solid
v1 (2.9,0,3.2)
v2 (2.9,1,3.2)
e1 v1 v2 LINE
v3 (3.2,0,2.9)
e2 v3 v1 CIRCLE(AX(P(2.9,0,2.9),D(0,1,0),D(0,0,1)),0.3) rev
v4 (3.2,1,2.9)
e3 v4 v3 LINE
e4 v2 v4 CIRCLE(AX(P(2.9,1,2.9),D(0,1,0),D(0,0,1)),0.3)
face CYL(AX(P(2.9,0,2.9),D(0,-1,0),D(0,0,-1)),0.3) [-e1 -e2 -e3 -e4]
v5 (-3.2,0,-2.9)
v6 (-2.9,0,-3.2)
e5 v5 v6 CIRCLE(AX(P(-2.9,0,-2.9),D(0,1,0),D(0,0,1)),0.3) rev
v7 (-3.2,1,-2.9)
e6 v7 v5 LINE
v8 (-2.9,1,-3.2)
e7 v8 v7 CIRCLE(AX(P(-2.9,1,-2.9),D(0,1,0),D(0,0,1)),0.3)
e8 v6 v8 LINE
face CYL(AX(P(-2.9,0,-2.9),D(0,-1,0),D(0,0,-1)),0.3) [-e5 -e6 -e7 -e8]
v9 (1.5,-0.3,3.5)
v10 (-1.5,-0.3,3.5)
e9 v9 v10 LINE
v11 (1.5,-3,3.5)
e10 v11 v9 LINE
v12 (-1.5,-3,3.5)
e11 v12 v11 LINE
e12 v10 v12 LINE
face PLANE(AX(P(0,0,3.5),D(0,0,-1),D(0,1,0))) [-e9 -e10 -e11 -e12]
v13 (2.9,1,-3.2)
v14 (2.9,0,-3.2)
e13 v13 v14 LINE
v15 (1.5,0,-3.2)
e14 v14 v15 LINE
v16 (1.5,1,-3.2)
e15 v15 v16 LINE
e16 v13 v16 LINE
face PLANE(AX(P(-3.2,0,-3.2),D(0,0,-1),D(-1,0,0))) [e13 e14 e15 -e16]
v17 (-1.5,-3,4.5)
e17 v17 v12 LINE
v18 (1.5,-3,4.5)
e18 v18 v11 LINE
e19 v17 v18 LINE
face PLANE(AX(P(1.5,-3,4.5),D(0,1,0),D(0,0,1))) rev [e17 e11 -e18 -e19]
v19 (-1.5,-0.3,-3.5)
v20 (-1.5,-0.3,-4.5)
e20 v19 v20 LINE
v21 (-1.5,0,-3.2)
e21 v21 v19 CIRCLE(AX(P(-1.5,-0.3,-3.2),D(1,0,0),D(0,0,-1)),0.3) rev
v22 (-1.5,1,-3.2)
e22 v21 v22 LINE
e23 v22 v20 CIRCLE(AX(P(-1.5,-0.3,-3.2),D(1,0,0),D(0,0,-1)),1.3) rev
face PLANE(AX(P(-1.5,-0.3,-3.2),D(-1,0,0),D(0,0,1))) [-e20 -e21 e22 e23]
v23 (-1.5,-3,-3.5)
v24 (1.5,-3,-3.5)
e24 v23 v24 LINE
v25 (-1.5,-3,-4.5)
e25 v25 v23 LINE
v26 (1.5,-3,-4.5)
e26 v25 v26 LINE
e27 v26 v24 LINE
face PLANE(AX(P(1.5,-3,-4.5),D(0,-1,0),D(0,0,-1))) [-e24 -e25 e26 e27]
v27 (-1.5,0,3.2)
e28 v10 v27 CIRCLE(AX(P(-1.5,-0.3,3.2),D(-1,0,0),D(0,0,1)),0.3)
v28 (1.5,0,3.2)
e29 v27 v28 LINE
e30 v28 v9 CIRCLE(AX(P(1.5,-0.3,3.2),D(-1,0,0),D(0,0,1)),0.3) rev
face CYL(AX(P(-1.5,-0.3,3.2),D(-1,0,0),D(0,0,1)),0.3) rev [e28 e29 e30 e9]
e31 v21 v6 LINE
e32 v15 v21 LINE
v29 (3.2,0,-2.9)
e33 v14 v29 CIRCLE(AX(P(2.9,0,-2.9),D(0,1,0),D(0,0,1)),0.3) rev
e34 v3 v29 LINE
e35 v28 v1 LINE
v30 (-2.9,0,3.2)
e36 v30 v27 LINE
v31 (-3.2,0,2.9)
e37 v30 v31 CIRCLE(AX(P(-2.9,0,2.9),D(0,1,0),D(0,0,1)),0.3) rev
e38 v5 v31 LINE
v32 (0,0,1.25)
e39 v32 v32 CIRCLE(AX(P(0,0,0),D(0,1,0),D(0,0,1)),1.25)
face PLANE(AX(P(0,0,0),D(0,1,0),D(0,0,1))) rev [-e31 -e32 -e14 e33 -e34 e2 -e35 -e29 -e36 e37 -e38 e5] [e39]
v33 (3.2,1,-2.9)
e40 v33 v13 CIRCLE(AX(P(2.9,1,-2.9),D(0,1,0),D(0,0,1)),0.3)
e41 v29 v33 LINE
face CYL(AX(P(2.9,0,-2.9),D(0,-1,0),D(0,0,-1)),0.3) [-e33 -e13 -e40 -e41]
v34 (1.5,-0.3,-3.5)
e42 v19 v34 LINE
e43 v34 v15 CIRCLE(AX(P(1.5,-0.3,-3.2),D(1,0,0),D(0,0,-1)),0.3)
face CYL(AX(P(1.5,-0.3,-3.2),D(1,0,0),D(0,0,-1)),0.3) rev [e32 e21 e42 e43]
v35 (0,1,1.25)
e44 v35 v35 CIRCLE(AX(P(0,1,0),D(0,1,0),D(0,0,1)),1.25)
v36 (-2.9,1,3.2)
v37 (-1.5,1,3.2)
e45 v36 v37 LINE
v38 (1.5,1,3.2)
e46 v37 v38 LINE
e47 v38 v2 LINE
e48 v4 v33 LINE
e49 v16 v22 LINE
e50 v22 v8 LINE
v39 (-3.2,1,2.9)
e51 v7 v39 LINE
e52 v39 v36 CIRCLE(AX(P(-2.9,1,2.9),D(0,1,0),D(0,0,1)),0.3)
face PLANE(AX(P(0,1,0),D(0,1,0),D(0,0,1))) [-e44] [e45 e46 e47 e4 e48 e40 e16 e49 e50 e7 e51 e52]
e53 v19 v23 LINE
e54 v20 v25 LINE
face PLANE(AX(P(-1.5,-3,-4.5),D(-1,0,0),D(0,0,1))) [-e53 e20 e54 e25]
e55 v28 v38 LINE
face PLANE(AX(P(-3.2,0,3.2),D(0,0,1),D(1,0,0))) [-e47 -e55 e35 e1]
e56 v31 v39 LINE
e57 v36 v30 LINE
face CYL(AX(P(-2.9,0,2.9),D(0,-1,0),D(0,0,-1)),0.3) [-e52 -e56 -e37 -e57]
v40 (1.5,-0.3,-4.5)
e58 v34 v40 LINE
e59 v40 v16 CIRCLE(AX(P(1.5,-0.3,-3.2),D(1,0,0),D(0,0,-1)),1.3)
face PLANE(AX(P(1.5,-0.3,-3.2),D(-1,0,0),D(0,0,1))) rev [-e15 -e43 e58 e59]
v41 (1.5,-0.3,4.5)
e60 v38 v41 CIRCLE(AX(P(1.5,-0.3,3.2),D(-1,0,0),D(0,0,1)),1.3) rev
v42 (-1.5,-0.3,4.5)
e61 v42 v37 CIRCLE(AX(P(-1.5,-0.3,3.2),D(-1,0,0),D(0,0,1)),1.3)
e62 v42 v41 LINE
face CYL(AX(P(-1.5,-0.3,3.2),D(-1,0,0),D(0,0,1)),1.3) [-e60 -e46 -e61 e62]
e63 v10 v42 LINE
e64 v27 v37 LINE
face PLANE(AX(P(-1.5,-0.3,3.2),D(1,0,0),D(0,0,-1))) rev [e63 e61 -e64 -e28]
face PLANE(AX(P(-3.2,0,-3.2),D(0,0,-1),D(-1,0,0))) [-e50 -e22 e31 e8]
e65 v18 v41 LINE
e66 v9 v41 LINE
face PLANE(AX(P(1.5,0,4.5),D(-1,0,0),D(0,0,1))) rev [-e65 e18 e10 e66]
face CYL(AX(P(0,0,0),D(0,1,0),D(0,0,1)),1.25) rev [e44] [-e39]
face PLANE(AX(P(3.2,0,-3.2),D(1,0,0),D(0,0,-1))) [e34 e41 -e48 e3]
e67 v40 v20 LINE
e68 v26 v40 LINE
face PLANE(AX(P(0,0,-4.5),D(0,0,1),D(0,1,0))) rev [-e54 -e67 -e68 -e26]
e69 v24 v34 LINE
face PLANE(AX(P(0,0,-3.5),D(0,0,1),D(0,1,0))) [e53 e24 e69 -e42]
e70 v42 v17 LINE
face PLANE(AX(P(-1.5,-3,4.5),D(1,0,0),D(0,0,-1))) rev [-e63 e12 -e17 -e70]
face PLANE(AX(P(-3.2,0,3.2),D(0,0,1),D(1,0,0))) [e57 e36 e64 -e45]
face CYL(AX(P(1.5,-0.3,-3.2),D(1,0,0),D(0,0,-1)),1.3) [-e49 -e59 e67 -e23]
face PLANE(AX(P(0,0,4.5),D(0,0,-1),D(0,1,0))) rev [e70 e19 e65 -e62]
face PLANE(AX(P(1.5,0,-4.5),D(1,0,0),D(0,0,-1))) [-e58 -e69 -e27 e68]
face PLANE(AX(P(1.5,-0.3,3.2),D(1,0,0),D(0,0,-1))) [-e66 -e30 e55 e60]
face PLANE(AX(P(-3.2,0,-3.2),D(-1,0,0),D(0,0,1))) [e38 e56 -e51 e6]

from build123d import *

# Parameters (mm, degrees)
SKETCH1_W             = 6.4
SKETCH1_H             = 6.4
BOSS_EXTRUDE1_DEPTH   = 1
M3X0_5_TAPPED_HOLE1_D = 2.5
EDGE_FLANGE1_DEPTH    = 3
FILLET1_R             = 0.3


# Sheet-metal steps are written as plain solids
with BuildPart() as part:
    # Sketch1 → Boss-Extrude1 (new body)
    with BuildSketch(Plane(origin=(0, 0, 0), x_dir=(1, 0, 0), z_dir=(0, 1, 0))):
        Rectangle(SKETCH1_W, SKETCH1_H)
    extrude(amount=BOSS_EXTRUDE1_DEPTH)

    # M3x0.5 Tapped Hole1 (through all)
    with Locations(Plane(origin=(0, 1, 0), x_dir=(1, 0, 0), z_dir=(0, 1, 0))):
        with Locations((0, 0)):
            Hole(M3X0_5_TAPPED_HOLE1_D / 2)

    # Edge-Flange1 section (across the edge) → Edge-Flange1 (add)
    with BuildSketch(Plane(origin=(1.5, 0, 3.5), x_dir=(0, 0, -1), z_dir=(-1, 0, 0))):
        with BuildLine():
            Line((-1, 0.3), (-1, 3))
            Line((-1, 3), (0, 3))
            Line((0, 3), (0, 0.3))
            ThreePointArc((0, 0.3), (0.087867966, 0.087867966), (0.3, 0))
            Line((0.3, 0), (0.3, -1))
            ThreePointArc((0.3, -1), (-0.619238816, -0.619238816), (-1, 0.3))
        make_face()
    edge_flange1 = extrude(amount=EDGE_FLANGE1_DEPTH)

    # Mirror1: Edge-Flange1 across plane
    add(edge_flange1.mirror(Plane.XY))

    # Fillet1
    fillet1_edges = [part.edges().sort_by_distance(p)[0] for p in [
        (-3.2, 0.5, 3.2),
        (3.2, 0.5, 3.2),
        (3.2, 0.5, -3.2),
        (-3.2, 0.5, -3.2),
    ]]
    fillet(fillet1_edges, radius=FILLET1_R)


solid = part.part
